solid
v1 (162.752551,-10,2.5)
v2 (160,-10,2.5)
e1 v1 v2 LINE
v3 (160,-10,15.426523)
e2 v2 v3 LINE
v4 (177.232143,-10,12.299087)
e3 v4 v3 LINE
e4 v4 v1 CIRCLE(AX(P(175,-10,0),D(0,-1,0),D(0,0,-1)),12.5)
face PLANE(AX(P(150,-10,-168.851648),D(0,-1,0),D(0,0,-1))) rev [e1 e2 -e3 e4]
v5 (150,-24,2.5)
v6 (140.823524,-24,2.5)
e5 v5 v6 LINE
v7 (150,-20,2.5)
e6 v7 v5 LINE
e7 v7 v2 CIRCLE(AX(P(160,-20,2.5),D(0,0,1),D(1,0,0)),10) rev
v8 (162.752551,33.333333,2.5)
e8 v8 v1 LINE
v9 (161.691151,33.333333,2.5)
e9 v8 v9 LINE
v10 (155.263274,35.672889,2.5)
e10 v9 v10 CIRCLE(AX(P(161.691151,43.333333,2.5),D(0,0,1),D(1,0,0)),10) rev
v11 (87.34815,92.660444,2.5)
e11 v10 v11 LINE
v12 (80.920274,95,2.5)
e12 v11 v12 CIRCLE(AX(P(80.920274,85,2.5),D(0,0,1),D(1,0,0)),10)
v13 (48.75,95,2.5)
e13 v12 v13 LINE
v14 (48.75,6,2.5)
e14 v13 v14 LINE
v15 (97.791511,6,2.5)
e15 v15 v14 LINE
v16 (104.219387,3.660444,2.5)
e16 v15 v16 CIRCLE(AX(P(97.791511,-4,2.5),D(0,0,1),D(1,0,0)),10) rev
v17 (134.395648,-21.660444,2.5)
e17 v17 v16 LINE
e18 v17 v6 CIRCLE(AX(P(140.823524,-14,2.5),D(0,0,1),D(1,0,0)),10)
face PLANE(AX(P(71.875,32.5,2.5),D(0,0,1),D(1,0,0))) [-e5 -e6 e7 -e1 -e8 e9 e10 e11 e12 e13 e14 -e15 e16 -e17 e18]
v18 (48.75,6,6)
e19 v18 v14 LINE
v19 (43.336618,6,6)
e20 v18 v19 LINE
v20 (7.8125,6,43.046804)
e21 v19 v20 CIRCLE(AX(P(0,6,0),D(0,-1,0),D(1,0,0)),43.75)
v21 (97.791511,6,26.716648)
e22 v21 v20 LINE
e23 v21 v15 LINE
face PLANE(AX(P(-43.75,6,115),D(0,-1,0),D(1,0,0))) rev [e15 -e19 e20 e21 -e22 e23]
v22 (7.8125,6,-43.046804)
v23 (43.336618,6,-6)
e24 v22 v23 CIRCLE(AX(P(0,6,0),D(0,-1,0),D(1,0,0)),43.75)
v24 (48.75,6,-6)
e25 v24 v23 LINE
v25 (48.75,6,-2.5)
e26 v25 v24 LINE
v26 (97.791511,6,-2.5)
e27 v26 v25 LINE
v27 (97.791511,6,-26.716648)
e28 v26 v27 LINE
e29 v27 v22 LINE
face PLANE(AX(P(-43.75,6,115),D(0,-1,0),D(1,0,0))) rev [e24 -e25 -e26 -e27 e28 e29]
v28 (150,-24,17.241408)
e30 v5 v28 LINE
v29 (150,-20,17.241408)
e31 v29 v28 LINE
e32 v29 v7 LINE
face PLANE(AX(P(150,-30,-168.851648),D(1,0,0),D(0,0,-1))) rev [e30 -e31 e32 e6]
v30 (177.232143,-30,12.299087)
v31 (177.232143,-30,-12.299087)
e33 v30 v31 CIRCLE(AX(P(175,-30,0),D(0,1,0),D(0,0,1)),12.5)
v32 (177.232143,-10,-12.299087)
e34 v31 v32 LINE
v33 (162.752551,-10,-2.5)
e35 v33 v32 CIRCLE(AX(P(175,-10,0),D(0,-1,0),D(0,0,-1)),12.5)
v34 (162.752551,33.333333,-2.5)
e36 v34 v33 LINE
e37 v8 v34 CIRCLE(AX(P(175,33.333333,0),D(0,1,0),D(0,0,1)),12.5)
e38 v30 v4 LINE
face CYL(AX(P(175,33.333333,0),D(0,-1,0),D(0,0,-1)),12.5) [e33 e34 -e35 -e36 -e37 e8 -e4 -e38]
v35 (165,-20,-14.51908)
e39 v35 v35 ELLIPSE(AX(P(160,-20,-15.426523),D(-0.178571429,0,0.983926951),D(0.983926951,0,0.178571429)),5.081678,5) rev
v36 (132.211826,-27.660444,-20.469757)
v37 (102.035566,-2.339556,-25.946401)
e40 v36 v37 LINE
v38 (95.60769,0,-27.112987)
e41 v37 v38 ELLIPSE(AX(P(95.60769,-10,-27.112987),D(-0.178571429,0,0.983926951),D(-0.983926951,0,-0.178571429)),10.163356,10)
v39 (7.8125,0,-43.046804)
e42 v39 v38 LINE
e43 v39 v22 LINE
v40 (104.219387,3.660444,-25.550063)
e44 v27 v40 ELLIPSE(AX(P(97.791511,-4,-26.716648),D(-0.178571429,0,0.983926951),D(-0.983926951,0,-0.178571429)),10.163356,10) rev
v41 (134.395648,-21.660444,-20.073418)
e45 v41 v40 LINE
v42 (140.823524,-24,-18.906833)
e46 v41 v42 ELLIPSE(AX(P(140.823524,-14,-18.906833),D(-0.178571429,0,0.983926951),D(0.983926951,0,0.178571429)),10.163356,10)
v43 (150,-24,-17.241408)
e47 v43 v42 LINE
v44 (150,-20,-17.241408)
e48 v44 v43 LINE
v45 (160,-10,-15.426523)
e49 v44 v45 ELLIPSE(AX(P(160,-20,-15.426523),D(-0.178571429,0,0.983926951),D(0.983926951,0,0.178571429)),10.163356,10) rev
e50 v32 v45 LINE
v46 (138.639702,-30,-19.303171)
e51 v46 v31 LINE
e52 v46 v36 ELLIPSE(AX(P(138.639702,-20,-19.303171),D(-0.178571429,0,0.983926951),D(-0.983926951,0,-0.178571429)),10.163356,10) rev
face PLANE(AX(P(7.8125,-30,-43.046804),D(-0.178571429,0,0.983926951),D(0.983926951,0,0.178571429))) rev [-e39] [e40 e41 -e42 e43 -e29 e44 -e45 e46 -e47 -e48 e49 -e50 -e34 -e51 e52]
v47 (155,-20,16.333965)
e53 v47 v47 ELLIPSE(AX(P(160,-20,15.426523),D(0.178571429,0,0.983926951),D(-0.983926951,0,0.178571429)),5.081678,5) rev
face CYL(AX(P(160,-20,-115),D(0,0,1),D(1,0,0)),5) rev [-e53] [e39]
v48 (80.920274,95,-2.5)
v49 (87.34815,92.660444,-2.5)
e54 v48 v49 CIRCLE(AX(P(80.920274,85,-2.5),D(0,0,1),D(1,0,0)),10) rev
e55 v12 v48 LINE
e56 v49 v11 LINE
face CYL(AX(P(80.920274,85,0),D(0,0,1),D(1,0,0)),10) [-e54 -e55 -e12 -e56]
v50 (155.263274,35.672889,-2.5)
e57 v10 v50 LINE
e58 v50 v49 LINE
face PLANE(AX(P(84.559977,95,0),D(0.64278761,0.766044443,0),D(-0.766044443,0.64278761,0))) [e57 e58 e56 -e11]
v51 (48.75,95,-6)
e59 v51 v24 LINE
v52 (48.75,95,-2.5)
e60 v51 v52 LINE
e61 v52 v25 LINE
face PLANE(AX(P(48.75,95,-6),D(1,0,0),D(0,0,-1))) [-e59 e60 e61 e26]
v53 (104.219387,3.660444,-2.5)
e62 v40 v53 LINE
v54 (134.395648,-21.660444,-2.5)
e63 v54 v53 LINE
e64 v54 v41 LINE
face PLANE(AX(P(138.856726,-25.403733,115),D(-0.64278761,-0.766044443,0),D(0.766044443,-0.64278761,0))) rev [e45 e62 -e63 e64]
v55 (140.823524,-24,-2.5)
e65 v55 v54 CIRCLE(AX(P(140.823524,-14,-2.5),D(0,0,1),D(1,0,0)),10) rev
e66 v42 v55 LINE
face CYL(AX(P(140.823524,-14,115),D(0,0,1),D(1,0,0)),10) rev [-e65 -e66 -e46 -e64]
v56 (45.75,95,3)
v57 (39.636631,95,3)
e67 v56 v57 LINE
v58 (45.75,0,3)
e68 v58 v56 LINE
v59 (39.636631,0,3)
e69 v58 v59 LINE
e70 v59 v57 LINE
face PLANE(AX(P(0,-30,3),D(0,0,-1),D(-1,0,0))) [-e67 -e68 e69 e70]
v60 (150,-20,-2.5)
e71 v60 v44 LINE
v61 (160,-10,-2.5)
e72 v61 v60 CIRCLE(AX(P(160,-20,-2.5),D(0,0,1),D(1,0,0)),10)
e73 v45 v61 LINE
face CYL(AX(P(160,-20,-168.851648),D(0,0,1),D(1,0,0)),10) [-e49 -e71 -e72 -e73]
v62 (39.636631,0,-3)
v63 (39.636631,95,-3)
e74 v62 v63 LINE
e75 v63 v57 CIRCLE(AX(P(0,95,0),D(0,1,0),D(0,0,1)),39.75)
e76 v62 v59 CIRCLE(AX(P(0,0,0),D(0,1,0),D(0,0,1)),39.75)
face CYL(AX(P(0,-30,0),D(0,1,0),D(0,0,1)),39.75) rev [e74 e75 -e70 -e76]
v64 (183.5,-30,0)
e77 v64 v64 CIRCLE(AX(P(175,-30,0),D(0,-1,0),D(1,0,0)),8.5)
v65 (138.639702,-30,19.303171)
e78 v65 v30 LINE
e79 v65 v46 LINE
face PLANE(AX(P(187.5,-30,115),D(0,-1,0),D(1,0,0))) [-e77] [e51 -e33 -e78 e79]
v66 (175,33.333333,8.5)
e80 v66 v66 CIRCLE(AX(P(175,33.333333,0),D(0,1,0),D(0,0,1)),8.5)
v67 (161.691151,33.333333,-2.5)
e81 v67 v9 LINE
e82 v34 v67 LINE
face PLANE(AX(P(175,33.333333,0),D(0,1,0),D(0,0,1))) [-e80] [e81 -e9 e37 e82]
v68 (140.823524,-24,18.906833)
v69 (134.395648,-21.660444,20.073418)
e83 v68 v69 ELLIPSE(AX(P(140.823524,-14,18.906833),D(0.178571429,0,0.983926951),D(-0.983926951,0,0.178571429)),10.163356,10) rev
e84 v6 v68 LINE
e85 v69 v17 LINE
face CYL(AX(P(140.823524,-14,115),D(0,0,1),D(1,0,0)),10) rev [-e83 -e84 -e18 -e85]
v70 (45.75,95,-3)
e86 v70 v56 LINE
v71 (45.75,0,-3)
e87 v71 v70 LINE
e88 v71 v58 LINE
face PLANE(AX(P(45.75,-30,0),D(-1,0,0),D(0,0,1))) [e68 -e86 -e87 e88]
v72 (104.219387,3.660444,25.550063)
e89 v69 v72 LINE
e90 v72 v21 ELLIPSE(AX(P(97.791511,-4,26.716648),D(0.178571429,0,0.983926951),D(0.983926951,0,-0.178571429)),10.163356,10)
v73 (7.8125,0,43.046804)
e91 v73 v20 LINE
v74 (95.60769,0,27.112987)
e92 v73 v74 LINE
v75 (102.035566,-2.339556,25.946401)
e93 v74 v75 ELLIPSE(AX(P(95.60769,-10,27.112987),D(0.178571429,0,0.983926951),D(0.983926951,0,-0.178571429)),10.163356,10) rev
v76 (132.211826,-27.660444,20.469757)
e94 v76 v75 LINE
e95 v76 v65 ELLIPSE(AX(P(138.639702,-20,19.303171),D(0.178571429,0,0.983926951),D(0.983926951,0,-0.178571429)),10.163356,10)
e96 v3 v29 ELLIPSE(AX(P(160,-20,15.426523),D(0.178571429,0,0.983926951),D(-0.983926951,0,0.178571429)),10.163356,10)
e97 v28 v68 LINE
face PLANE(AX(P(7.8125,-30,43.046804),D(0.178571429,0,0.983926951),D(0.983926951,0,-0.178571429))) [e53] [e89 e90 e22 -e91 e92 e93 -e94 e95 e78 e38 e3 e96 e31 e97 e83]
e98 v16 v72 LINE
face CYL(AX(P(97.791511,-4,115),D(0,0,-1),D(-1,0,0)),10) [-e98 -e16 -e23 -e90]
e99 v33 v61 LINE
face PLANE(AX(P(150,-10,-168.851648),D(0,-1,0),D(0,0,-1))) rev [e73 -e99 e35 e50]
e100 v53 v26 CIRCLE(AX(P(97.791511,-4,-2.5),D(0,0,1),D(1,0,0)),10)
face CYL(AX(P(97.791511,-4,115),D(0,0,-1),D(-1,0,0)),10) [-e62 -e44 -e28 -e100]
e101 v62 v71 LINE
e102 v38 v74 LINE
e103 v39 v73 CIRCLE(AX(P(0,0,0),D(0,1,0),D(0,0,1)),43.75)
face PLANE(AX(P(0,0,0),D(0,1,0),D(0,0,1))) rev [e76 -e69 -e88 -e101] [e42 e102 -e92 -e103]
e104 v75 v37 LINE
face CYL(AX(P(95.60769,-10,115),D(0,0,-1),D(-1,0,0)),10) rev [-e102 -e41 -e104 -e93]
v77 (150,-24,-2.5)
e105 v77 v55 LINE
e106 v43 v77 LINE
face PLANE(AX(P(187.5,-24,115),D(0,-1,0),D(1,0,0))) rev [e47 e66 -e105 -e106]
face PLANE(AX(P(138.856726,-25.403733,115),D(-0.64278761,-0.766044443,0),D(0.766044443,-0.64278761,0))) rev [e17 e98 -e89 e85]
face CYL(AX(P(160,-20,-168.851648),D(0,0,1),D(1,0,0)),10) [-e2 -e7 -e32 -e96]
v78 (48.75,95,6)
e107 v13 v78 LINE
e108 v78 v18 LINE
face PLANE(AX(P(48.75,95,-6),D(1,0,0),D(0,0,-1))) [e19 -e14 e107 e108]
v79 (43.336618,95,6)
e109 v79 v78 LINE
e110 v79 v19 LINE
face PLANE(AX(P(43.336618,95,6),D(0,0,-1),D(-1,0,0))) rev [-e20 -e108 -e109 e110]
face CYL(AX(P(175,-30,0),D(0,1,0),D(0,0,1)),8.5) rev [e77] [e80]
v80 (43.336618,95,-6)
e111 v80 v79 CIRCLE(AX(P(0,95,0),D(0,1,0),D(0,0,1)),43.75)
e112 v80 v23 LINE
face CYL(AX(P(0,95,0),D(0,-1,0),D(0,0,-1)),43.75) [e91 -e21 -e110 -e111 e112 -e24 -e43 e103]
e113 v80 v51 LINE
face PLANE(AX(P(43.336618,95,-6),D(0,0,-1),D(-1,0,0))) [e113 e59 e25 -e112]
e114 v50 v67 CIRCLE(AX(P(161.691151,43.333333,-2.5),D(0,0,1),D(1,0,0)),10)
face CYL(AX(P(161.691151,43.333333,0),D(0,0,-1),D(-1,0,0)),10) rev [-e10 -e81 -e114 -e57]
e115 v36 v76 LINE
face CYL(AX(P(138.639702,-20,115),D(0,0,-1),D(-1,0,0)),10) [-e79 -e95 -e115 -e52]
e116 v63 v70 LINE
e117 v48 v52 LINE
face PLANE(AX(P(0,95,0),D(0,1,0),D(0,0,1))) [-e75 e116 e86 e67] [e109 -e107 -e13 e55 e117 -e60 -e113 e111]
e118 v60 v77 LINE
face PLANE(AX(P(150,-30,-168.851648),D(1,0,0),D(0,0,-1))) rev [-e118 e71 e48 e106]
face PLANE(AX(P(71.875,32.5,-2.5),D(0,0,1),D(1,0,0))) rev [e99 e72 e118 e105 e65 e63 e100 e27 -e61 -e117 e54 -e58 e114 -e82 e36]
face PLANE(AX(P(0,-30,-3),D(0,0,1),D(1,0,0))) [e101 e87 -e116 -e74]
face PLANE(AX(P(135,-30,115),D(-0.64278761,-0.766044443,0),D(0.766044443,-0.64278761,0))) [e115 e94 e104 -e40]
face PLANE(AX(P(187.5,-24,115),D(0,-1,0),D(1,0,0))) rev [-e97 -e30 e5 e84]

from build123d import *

# Parameters (mm, degrees)
BOSS_EXTRUDE1_DEPTH     = 95
BOSS_EXTRUDE2_START     = -30
SKETCH2_3_R             = 12.5
BOSS_EXTRUDE2_DEPTH     = 63.333333333
EXTRUDE_THIN1_DEPTH     = 115
SKETCH5_W               = 50
SKETCH5_H               = 20
BOSS_EXTRUDE3_DEPTH     = 230
CUT_EXTRUDE2_DEPTH      = 320.256949807
CUT_EXTRUDE2_DEPTH_BACK = 320.256949807
SKETCH5_3_R             = 5
CUT_EXTRUDE1_START      = -30
CUT_EXTRUDE1_OUTLINE_R  = 8.5
CUT_EXTRUDE1_DEPTH      = 125
RIB1_START              = -2.5
RIB1_DEPTH              = 5
FILLET1_R               = 10


# Read off the part's stored shape, not the designer's step: Cut-Extrude1, Rib1
with BuildPart() as part:
    # Sketch2 → Boss-Extrude1 (new body)
    with BuildSketch(Plane(origin=(0, 0, 0), x_dir=(1, 0, 0), z_dir=(0, 1, 0))):
        with BuildLine():
            Line((43.336618465, 6), (48.75, 6))
            Line((48.75, 6), (48.75, -6))
            Line((48.75, -6), (43.336618465, -6))
            ThreePointArc((43.336618465, -6), (-43.75, 0), (43.336618465, 6))
        make_face()
    extrude(amount=BOSS_EXTRUDE1_DEPTH)



with BuildPart() as body_2:
    # Sketch2<3> → Boss-Extrude2 (new body)
    with BuildSketch(Plane(origin=(0, 0, 0), x_dir=(1, 0, 0), z_dir=(0, 1, 0)).offset(BOSS_EXTRUDE2_START)):
        with Locations(Location((175, 0, 0), (0, 0, 270))):
            Circle(SKETCH2_3_R)
    extrude(amount=BOSS_EXTRUDE2_DEPTH)


with BuildPart() as part_1:
    add(part.part)

    add(body_2.part)  # Extrude-Thin1 merges body 2
    # Sketch3 → Extrude-Thin1 (add, symmetric)
    with BuildSketch(Plane.XY):
        Polygon((-43.75, 0), (99.247392222, 0), (135, -30), (187.5, -30), (187.5, -24), (137.183821406, -24), (101.431213628, 6), (-43.75, 6), align=None)
    extrude(amount=EXTRUDE_THIN1_DEPTH, both=True)

    # Sketch5 → Boss-Extrude3 (add)
    with BuildSketch(Plane.XY.offset(115)):
        with Locations((175, -20)):
            Rectangle(SKETCH5_W, SKETCH5_H)
    extrude(amount=-BOSS_EXTRUDE3_DEPTH)

    # Sketch5<3> → Cut-Extrude2 (cut, two sides: drawn at the far end of the back side and taken through both)
    with BuildSketch(Plane.XY.offset(115).offset(-CUT_EXTRUDE2_DEPTH_BACK)):
        with Locations((160, -20)):
            Circle(SKETCH5_3_R)
    extrude(amount=CUT_EXTRUDE2_DEPTH + CUT_EXTRUDE2_DEPTH_BACK, mode=Mode.SUBTRACT)

    # Cut-Extrude1 outline → Cut-Extrude1 (cut)
    with BuildSketch(Plane(origin=(0, 0, 0), x_dir=(1, 0, 0), z_dir=(0, 1, 0)).offset(CUT_EXTRUDE1_START)):
        with BuildLine():
            ThreePointArc((177.232142857, 12.299086887), (184.59561842, 8.010874306), (187.5, 0))
            ThreePointArc((187.5, 0), (184.59561842, -8.010874306), (177.232142857, -12.299086887))
            Line((177.232142857, -12.299086887), (150, -17.241407705))
            Line((150, -17.241407705), (150, -115))
            Line((150, -115), (200, -115))
            Line((200, -115), (200, 115))
            Line((200, 115), (150, 115))
            Line((150, 115), (150, 17.241407705))
            Line((150, 17.241407705), (177.232142857, 12.299086887))
        make_face()
        with BuildLine():
            Line((7.8125, 43.046804106), (150, 17.241407705))
            Line((150, 17.241407705), (150, 115))
            Line((150, 115), (-43.75, 115))
            Line((-43.75, 115), (-43.75, -4.5e-08))
            ThreePointArc((-43.75, -4.5e-08), (-28.038060087, 33.584664455), (7.8125, 43.046804106))
        make_face()
        with BuildLine():
            Line((150, -115), (150, -17.241407705))
            Line((150, -17.241407705), (7.8125, -43.046804106))
            ThreePointArc((7.8125, -43.046804106), (-28.038060053, -33.584664483), (-43.75, -4.5e-08))
            Line((-43.75, -4.5e-08), (-43.75, -115))
            Line((-43.75, -115), (150, -115))
        make_face()
        with Locations((175, 0)):
            Circle(CUT_EXTRUDE1_OUTLINE_R)
        with BuildLine():
            Line((45.75, 3), (39.636630785, 3))
            ThreePointArc((39.636630785, 3), (-39.75, 0), (39.636630785, -3))
            Line((39.636630785, -3), (45.75, -3))
            Line((45.75, -3), (45.75, 3))
        make_face()
    extrude(amount=CUT_EXTRUDE1_DEPTH, mode=Mode.SUBTRACT)

    # Rib1 outline → Rib1 (add)
    with BuildSketch(Plane.XY.offset(RIB1_START)):
        Polygon((158.05144817, 33.333333333), (84.559976627, 95), (48.75, 95), (48.75, 6), (101.431213628, 6), (137.183821406, -24), (150, -24), (150, -10), (164, -10), (164, 33.333333333), align=None)
    extrude(amount=RIB1_DEPTH)

    # Fillet1
    fillet1_edges = [part_1.edges().sort_by_distance(p)[0] for p in [
        (150, -10, 9.870703853),
        (137.183821406, -24, -11.033698381),
        (101.431213628, 6, -14.278041998),
        (158.05144817, 33.333333333, 0),
        (84.559976627, 95, 0),
        (150, -10, -9.870703853),
        (99.247392222, 0, 0),
        (101.431213628, 6, 14.278041998),
        (137.183821406, -24, 11.033698381),
        (135, -30, 0),
    ]]
    fillet(fillet1_edges, radius=FILLET1_R)


solid = part_1.part
